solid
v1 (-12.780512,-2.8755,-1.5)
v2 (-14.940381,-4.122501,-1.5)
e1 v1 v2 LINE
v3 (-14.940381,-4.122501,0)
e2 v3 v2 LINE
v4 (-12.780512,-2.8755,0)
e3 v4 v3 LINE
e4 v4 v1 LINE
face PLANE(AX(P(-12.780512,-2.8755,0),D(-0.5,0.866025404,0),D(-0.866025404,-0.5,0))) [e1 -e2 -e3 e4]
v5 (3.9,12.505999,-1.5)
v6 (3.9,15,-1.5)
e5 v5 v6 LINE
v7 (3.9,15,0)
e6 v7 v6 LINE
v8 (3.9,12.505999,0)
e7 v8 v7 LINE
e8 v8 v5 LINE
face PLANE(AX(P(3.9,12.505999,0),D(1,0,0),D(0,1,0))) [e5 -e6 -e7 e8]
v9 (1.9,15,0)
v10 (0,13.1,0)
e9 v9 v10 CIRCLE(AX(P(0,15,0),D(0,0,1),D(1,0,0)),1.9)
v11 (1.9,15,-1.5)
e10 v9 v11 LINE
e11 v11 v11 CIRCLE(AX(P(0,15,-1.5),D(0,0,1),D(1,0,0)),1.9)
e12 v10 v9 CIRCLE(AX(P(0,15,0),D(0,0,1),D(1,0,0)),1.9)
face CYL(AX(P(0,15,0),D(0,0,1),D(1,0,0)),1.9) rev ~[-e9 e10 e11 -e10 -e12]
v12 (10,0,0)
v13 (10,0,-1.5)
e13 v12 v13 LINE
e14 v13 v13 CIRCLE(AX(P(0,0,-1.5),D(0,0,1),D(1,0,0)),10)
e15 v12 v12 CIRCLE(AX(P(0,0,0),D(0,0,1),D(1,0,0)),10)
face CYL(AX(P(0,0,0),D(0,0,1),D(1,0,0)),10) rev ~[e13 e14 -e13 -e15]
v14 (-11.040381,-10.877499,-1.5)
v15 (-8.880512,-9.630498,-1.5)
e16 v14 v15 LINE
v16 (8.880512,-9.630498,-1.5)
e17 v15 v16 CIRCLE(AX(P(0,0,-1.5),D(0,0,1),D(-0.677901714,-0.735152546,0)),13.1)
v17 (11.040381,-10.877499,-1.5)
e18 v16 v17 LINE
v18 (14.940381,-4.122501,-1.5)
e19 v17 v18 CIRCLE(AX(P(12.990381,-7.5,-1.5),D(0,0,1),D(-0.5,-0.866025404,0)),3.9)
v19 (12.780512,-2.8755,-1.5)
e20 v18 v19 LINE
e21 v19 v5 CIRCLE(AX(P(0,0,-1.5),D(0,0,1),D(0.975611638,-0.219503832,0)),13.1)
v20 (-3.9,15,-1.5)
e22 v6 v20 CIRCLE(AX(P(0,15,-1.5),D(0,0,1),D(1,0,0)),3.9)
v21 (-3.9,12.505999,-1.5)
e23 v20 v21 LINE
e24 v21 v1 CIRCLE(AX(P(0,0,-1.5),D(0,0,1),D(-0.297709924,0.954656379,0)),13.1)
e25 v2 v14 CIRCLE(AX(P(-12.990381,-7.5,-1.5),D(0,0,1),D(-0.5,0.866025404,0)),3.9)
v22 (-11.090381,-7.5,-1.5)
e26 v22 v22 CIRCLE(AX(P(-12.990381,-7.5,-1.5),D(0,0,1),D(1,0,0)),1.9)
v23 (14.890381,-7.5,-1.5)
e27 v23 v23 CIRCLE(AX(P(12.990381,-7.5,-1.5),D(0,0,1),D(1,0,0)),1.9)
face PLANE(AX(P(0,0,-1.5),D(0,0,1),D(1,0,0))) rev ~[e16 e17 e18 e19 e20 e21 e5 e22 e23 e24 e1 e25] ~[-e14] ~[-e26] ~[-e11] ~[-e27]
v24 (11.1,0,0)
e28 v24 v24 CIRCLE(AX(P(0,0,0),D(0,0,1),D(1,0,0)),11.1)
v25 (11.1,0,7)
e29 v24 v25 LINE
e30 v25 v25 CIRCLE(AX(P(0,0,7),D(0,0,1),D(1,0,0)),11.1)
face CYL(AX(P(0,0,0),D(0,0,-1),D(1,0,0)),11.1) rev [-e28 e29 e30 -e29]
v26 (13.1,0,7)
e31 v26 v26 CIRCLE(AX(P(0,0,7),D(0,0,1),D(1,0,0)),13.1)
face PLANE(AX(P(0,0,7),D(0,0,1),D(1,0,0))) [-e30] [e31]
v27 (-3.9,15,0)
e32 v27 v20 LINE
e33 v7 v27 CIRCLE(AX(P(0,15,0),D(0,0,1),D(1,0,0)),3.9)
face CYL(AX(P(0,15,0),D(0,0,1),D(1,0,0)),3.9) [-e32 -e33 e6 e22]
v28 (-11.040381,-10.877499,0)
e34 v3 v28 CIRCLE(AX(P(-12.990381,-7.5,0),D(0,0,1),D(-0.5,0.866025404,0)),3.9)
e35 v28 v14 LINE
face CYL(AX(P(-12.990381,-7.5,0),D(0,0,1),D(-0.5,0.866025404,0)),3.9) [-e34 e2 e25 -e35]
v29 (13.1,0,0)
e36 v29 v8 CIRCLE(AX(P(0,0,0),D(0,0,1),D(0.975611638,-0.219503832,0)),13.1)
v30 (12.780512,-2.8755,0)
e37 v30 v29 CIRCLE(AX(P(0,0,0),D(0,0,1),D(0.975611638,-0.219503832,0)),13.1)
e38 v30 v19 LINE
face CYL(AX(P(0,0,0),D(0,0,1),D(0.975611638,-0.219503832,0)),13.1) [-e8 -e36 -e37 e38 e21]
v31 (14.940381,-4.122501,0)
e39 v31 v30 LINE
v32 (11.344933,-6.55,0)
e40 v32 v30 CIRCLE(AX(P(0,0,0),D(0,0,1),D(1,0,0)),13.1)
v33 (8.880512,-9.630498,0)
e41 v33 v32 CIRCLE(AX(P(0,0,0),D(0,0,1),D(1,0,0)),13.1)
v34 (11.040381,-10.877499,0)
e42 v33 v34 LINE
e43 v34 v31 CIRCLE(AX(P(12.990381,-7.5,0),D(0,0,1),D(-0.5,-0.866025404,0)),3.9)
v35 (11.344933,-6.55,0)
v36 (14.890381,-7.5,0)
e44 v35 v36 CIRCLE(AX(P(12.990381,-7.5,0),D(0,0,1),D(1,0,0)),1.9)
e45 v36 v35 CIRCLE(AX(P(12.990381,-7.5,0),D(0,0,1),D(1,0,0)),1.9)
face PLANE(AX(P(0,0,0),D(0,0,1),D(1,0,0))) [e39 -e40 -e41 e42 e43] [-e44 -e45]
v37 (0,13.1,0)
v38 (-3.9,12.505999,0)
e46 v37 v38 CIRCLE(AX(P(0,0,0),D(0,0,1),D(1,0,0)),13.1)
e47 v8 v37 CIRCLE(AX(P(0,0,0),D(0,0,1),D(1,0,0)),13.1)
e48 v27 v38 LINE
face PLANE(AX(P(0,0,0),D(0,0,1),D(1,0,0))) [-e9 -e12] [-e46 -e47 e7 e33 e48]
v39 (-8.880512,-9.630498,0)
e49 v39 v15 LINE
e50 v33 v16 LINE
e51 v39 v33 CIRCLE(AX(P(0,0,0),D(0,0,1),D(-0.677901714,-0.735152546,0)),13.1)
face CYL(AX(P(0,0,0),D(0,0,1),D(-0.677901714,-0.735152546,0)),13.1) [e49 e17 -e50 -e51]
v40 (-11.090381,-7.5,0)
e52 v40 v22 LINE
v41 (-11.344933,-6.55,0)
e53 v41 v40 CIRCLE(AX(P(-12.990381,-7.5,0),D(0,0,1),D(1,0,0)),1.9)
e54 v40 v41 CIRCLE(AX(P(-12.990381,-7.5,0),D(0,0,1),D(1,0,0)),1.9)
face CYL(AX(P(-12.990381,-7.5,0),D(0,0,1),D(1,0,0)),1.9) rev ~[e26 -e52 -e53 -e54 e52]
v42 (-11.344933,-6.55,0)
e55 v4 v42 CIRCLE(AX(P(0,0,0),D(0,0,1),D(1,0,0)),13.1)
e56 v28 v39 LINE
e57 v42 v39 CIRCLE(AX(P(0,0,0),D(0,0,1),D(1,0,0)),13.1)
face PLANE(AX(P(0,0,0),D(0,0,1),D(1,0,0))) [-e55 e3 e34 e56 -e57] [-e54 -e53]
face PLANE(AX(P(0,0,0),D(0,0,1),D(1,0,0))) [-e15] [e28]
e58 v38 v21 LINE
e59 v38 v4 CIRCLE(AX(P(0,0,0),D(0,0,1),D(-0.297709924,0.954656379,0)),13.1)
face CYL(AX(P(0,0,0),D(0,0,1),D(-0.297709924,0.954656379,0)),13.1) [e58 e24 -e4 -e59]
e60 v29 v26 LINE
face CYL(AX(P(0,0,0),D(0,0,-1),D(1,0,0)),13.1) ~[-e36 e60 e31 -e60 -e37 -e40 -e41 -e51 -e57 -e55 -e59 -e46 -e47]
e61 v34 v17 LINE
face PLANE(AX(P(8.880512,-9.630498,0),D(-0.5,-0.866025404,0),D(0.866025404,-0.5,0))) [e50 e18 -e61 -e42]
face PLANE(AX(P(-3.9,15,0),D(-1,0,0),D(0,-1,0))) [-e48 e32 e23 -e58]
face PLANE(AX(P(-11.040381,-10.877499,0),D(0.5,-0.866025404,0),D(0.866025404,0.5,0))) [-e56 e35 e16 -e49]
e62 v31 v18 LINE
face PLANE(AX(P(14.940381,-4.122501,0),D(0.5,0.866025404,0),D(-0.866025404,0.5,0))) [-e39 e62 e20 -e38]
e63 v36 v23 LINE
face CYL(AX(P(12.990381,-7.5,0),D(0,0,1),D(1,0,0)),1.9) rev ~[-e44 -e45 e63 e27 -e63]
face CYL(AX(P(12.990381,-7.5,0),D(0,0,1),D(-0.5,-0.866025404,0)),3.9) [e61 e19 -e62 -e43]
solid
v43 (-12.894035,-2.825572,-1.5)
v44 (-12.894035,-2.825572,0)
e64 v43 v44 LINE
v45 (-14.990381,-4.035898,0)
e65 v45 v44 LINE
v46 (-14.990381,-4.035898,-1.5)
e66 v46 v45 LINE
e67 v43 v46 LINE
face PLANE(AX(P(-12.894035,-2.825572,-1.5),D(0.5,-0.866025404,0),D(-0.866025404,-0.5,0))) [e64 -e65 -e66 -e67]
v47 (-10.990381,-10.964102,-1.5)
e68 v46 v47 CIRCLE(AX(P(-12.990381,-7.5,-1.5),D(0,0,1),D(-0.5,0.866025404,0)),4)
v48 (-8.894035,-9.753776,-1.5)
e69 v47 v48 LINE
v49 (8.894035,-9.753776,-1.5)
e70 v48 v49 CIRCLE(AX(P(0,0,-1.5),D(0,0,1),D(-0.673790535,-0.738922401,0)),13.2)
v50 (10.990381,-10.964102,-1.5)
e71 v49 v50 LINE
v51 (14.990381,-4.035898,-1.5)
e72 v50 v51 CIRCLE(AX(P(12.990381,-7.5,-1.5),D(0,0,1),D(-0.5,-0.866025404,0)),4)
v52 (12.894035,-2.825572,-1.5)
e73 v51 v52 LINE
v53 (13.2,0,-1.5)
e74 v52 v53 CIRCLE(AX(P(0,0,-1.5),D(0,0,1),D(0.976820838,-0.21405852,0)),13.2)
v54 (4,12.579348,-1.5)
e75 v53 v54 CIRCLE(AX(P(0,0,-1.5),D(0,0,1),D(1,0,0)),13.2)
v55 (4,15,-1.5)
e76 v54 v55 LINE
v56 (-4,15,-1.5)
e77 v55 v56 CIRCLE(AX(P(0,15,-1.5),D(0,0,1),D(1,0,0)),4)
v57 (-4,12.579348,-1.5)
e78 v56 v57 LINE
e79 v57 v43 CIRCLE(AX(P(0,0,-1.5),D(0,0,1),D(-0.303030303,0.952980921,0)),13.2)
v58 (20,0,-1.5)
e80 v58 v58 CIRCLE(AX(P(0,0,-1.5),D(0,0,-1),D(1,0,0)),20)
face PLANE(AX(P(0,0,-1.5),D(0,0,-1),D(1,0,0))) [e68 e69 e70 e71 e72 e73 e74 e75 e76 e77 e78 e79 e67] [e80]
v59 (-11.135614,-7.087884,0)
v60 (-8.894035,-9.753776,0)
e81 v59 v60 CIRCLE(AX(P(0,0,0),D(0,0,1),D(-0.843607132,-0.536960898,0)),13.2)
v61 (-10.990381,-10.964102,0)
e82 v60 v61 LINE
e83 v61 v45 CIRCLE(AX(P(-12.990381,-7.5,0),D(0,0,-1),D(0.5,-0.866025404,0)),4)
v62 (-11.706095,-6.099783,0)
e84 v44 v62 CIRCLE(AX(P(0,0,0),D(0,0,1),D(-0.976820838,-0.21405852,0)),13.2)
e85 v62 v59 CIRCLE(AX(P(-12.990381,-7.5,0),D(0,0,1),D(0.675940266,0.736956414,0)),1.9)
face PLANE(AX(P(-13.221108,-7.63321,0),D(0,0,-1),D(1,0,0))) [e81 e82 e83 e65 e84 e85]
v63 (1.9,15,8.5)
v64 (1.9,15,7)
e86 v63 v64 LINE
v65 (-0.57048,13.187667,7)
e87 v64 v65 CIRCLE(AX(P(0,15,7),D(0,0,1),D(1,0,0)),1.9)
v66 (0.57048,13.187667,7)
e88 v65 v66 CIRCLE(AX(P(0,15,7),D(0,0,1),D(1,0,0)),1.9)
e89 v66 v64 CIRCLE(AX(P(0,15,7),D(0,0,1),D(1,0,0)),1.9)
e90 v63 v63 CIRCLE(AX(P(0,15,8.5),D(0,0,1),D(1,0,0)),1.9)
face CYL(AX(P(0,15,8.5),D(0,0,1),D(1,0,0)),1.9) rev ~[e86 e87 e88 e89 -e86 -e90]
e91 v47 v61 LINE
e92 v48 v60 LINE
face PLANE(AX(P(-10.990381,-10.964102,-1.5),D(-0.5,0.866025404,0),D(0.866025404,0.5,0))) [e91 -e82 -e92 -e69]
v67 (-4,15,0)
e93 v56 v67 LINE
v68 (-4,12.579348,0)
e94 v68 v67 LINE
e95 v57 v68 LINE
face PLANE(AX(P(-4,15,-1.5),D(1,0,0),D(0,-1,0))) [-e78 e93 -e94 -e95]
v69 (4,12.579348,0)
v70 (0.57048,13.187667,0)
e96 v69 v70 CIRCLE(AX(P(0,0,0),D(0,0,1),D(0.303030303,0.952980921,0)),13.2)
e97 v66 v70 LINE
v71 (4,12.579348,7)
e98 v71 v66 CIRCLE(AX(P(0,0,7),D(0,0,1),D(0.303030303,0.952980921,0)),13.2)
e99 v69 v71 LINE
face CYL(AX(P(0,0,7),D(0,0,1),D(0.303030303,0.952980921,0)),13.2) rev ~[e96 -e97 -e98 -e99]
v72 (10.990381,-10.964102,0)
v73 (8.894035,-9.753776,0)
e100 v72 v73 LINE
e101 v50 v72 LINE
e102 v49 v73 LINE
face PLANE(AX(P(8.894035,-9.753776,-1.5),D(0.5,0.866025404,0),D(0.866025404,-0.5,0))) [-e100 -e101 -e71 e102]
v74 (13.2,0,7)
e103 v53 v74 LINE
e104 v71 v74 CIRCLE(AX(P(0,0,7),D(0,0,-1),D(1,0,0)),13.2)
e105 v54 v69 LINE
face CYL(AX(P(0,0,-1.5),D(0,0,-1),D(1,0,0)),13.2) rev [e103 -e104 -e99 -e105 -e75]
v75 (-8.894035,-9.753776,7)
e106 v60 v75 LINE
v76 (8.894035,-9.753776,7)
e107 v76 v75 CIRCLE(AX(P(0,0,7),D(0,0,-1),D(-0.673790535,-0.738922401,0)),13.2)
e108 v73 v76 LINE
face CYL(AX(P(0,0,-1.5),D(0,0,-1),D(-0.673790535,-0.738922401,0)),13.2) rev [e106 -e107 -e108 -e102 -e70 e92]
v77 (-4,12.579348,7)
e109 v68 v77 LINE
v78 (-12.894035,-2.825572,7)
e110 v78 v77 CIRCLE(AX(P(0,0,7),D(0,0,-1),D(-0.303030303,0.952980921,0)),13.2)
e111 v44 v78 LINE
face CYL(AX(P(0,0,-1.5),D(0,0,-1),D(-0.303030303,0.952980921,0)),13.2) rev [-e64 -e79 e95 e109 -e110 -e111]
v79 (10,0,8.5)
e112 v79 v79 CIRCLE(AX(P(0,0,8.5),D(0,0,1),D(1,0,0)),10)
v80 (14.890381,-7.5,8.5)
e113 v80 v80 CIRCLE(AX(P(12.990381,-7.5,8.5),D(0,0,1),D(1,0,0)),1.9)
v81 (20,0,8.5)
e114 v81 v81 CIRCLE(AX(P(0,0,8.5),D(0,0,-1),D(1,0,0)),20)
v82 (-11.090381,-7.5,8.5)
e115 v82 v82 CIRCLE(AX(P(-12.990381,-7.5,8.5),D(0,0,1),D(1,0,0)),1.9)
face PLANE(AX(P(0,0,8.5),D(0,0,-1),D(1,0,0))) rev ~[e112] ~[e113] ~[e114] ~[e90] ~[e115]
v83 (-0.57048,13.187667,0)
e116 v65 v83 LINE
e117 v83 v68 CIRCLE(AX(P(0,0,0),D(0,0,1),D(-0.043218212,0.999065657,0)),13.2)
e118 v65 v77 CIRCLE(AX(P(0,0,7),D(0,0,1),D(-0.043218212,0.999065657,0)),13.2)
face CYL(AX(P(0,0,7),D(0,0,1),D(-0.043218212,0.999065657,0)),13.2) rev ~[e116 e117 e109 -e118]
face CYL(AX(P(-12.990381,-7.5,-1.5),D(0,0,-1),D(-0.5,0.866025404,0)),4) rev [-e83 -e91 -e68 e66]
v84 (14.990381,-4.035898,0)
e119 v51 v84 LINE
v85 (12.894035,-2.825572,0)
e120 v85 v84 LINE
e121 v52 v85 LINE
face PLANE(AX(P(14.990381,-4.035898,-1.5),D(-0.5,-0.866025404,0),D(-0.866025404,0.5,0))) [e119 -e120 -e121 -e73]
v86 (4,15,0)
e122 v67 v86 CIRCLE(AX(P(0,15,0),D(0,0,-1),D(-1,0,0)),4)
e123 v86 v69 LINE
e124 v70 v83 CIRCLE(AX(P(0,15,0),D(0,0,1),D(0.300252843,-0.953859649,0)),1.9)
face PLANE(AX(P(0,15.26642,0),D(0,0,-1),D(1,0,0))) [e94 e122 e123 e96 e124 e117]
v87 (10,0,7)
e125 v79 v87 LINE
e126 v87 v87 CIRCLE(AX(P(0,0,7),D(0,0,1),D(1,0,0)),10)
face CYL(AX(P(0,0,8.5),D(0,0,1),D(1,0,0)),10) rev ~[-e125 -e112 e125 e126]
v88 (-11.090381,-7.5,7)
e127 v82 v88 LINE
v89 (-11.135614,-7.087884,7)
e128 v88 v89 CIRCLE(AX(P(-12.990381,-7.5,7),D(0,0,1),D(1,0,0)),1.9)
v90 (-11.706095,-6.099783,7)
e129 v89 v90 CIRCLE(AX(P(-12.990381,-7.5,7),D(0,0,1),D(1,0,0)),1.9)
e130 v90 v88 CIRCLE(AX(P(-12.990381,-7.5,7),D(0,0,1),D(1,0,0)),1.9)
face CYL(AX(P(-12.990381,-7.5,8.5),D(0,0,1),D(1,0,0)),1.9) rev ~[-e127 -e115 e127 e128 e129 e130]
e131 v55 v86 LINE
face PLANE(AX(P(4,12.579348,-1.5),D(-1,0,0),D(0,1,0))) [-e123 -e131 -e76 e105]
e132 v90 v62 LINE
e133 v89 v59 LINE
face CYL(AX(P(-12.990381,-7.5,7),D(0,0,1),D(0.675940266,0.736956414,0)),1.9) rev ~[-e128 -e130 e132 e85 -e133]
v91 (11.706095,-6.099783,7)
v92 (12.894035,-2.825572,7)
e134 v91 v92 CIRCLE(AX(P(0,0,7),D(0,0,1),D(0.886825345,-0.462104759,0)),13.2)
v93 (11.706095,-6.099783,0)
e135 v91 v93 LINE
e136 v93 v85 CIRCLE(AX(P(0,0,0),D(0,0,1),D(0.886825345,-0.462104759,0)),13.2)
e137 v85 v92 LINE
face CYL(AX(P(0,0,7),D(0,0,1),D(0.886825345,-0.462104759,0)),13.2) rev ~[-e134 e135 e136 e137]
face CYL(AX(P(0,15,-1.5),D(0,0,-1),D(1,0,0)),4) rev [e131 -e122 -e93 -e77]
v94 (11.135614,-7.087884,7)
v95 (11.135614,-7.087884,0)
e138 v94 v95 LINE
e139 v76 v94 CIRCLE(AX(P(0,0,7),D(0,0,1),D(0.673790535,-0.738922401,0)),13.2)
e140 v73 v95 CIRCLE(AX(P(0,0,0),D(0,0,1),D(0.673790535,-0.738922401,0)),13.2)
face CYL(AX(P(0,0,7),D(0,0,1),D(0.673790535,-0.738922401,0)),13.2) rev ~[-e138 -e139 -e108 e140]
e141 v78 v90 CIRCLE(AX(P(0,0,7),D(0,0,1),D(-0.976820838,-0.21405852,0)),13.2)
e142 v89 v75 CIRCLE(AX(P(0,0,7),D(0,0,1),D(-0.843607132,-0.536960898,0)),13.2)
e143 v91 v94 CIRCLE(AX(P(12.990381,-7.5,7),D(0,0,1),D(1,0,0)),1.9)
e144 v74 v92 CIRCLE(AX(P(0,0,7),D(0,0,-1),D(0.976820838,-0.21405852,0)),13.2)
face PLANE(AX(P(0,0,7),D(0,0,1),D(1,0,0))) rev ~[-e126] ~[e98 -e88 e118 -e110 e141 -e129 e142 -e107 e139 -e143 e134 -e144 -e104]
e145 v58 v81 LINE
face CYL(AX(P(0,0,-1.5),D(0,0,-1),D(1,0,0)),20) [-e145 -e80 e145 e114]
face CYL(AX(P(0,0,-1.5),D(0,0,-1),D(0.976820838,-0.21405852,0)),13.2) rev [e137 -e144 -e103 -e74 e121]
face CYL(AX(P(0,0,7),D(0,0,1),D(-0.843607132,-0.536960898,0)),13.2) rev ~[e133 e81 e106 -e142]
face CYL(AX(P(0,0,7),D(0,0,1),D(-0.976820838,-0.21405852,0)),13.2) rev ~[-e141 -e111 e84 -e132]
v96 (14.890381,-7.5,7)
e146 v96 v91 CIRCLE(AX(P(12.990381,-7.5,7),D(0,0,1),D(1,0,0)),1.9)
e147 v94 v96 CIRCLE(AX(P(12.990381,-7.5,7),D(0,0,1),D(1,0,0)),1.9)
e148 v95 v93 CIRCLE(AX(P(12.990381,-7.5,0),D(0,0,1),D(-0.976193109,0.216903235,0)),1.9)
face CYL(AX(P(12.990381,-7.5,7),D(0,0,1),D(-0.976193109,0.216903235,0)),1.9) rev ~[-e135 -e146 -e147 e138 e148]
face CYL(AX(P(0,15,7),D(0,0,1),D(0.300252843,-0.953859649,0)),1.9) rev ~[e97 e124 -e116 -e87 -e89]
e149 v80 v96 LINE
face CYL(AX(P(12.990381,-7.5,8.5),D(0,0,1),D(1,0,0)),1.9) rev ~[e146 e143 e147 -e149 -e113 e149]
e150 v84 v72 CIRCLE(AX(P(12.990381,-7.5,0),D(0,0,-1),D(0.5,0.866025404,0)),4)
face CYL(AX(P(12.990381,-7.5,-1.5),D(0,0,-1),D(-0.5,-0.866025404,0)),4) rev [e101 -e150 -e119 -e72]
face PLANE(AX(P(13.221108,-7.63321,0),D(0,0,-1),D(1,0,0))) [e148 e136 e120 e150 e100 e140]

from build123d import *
from build123d import SkipClean  # not in build123d's __all__

# Parameters (mm, degrees)
F0_R     = 1.9
F0_R_2   = 10
F1_DEPTH = 1.5
F2_R     = 13.1
F2_R_2   = 11.1
F3_DEPTH = 7
F4_R     = 20
F5_DEPTH = 10
F6_R     = 19.4230477787
F6_R_2   = 1.9
F6_R_3   = 10
F7_DEPTH = 1.5
F9_DEPTH = 7


with BuildPart() as f1:
    # F0 (on Top) → F1 (new body)
    with BuildSketch(Plane.XY):
        with BuildLine():
            Line((-3.9, 15), (-3.9, 12.5059985607))
            ThreePointArc((-3.9, 12.5059985607), (-11.3449327896, 6.55), (-12.7805124532, -2.8755002056))
            Line((-12.7805124532, -2.8755002056), (-14.9403810568, -4.1225009252))
            ThreePointArc((-14.9403810568, -4.1225009252), (-16.3678801315, -9.45), (-11.0403810568, -10.8774990748))
            Line((-11.0403810568, -10.8774990748), (-8.8805124532, -9.6304983551))
            ThreePointArc((-8.8805124532, -9.6304983551), (0, -13.1), (8.8805124532, -9.6304983551))
            Line((8.8805124532, -9.6304983551), (11.0403810568, -10.8774990748))
            ThreePointArc((11.0403810568, -10.8774990748), (16.3678801315, -9.45), (14.9403810568, -4.1225009252))
            Line((14.9403810568, -4.1225009252), (12.7805124532, -2.8755002056))
            ThreePointArc((12.7805124532, -2.8755002056), (11.3449327896, 6.55), (3.9, 12.5059985607))
            Line((3.9, 12.5059985607), (3.9, 15))
            ThreePointArc((3.9, 15), (0, 18.9), (-3.9, 15))
        make_face()
        with Locations((-12.9903810568, -7.5)):
            Circle(F0_R, mode=Mode.SUBTRACT)
        with Locations((12.9903810568, -7.5)):
            Circle(F0_R, mode=Mode.SUBTRACT)
        Circle(F0_R_2, mode=Mode.SUBTRACT)
        with Locations((0, 15)):
            Circle(F0_R, mode=Mode.SUBTRACT)
    extrude(amount=-F1_DEPTH)

    # F2 (on face) → F3 (join)
    with BuildSketch(Plane.XY):
        Circle(F2_R)
        Circle(F2_R_2, mode=Mode.SUBTRACT)
    with SkipClean():  # cleaning this boolean's faces spoils the solid; the shape is the same uncleaned
        extrude(amount=F3_DEPTH)


with BuildPart() as f5:
    # F4 (on face) → F5 (new body)
    with BuildSketch(Plane(origin=(0, 0, -1.5), x_dir=(1, 0, 0), z_dir=(0, 0, -1))):
        Circle(F4_R)
        with BuildLine():
            ThreePointArc((12.8940350651, 2.8255724623), (13.1232858473, 1.4210448868), (13.2, 0))
            ThreePointArc((13.2, 0), (10.6545764815, -7.7923038955), (4, -12.5793481548))
            Line((4, -12.5793481548), (4, -15))
            ThreePointArc((4, -15), (0, -19), (-4, -15))
            Line((-4, -15), (-4, -12.5793481548))
            ThreePointArc((-4, -12.5793481548), (-11.43153533, -6.6), (-12.8940350651, 2.8255724623))
            Line((-12.8940350651, 2.8255724623), (-14.9903810568, 4.0358983849))
            ThreePointArc((-14.9903810568, 4.0358983849), (-16.4544826719, 9.5), (-10.9903810568, 10.9641016151))
            Line((-10.9903810568, 10.9641016151), (-8.8940350651, 9.7537756925))
            ThreePointArc((-8.8940350651, 9.7537756925), (0, 13.2), (8.8940350651, 9.7537756925))
            Line((8.8940350651, 9.7537756925), (10.9903810568, 10.9641016151))
            ThreePointArc((10.9903810568, 10.9641016151), (16.4544826719, 9.5), (14.9903810568, 4.0358983849))
            Line((14.9903810568, 4.0358983849), (12.8940350651, 2.8255724623))
        make_face(mode=Mode.SUBTRACT)
    extrude(amount=-F5_DEPTH)

    # F6 (on face) → F7 (join)
    with BuildSketch(Plane.XY.offset(8.5)):
        Circle(F6_R)
        with Locations((-12.9903810568, -7.5)):
            Circle(F6_R_2, mode=Mode.SUBTRACT)
        with Locations((12.9903810568, -7.5)):
            Circle(F6_R_2, mode=Mode.SUBTRACT)
        Circle(F6_R_3, mode=Mode.SUBTRACT)
        with Locations((0, 15)):
            Circle(F6_R_2, mode=Mode.SUBTRACT)
    extrude(amount=-F7_DEPTH)

    # F8 (on face) → F9 (join)
    with BuildSketch(Plane(origin=(0, 0, 7), x_dir=(1, 0, 0), z_dir=(0, 0, -1))):
        with BuildLine():
            Line((-14.9903810568, 4.0358983849), (-12.8940350651, 2.8255724623))
            ThreePointArc((-12.8940350651, 2.8255724623), (-12.4085336618, 4.5020320261), (-11.7060945509, 6.099782813))
            ThreePointArc((-11.7060945509, 6.099782813), (-14.635829324, 8.45), (-11.1356141491, 7.0878838537))
            ThreePointArc((-11.1356141491, 7.0878838537), (-10.1031409341, 8.4950893618), (-8.8940350651, 9.7537756925))
            Line((-8.8940350651, 9.7537756925), (-10.9903810568, 10.9641016151))
            ThreePointArc((-10.9903810568, 10.9641016151), (-16.4544826719, 9.5), (-14.9903810568, 4.0358983849))
        make_face()
        with BuildLine():
            ThreePointArc((-4, -15), (0, -19), (4, -15))
            Line((4, -15), (4, -12.5793481548))
            ThreePointArc((4, -12.5793481548), (2.3053927277, -12.9971213879), (0.5704804018, -13.1876666667))
            ThreePointArc((0.5704804018, -13.1876666667), (0, -16.9), (-0.5704804018, -13.1876666667))
            ThreePointArc((-0.5704804018, -13.1876666667), (-2.3053927277, -12.9971213879), (-4, -12.5793481548))
            Line((-4, -12.5793481548), (-4, -15))
        make_face()
        with BuildLine():
            ThreePointArc((14.9903810568, 4.0358983849), (16.4544826719, 9.5), (10.9903810568, 10.9641016151))
            Line((10.9903810568, 10.9641016151), (8.8940350651, 9.7537756925))
            ThreePointArc((8.8940350651, 9.7537756925), (10.1031409341, 8.4950893618), (11.1356141491, 7.0878838537))
            ThreePointArc((11.1356141491, 7.0878838537), (14.635829324, 8.45), (11.7060945509, 6.099782813))
            ThreePointArc((11.7060945509, 6.099782813), (12.4085336618, 4.5020320261), (12.8940350651, 2.8255724623))
            Line((12.8940350651, 2.8255724623), (14.9903810568, 4.0358983849))
        make_face()
    extrude(amount=F9_DEPTH)


solid = Compound([f1.part, f5.part])
